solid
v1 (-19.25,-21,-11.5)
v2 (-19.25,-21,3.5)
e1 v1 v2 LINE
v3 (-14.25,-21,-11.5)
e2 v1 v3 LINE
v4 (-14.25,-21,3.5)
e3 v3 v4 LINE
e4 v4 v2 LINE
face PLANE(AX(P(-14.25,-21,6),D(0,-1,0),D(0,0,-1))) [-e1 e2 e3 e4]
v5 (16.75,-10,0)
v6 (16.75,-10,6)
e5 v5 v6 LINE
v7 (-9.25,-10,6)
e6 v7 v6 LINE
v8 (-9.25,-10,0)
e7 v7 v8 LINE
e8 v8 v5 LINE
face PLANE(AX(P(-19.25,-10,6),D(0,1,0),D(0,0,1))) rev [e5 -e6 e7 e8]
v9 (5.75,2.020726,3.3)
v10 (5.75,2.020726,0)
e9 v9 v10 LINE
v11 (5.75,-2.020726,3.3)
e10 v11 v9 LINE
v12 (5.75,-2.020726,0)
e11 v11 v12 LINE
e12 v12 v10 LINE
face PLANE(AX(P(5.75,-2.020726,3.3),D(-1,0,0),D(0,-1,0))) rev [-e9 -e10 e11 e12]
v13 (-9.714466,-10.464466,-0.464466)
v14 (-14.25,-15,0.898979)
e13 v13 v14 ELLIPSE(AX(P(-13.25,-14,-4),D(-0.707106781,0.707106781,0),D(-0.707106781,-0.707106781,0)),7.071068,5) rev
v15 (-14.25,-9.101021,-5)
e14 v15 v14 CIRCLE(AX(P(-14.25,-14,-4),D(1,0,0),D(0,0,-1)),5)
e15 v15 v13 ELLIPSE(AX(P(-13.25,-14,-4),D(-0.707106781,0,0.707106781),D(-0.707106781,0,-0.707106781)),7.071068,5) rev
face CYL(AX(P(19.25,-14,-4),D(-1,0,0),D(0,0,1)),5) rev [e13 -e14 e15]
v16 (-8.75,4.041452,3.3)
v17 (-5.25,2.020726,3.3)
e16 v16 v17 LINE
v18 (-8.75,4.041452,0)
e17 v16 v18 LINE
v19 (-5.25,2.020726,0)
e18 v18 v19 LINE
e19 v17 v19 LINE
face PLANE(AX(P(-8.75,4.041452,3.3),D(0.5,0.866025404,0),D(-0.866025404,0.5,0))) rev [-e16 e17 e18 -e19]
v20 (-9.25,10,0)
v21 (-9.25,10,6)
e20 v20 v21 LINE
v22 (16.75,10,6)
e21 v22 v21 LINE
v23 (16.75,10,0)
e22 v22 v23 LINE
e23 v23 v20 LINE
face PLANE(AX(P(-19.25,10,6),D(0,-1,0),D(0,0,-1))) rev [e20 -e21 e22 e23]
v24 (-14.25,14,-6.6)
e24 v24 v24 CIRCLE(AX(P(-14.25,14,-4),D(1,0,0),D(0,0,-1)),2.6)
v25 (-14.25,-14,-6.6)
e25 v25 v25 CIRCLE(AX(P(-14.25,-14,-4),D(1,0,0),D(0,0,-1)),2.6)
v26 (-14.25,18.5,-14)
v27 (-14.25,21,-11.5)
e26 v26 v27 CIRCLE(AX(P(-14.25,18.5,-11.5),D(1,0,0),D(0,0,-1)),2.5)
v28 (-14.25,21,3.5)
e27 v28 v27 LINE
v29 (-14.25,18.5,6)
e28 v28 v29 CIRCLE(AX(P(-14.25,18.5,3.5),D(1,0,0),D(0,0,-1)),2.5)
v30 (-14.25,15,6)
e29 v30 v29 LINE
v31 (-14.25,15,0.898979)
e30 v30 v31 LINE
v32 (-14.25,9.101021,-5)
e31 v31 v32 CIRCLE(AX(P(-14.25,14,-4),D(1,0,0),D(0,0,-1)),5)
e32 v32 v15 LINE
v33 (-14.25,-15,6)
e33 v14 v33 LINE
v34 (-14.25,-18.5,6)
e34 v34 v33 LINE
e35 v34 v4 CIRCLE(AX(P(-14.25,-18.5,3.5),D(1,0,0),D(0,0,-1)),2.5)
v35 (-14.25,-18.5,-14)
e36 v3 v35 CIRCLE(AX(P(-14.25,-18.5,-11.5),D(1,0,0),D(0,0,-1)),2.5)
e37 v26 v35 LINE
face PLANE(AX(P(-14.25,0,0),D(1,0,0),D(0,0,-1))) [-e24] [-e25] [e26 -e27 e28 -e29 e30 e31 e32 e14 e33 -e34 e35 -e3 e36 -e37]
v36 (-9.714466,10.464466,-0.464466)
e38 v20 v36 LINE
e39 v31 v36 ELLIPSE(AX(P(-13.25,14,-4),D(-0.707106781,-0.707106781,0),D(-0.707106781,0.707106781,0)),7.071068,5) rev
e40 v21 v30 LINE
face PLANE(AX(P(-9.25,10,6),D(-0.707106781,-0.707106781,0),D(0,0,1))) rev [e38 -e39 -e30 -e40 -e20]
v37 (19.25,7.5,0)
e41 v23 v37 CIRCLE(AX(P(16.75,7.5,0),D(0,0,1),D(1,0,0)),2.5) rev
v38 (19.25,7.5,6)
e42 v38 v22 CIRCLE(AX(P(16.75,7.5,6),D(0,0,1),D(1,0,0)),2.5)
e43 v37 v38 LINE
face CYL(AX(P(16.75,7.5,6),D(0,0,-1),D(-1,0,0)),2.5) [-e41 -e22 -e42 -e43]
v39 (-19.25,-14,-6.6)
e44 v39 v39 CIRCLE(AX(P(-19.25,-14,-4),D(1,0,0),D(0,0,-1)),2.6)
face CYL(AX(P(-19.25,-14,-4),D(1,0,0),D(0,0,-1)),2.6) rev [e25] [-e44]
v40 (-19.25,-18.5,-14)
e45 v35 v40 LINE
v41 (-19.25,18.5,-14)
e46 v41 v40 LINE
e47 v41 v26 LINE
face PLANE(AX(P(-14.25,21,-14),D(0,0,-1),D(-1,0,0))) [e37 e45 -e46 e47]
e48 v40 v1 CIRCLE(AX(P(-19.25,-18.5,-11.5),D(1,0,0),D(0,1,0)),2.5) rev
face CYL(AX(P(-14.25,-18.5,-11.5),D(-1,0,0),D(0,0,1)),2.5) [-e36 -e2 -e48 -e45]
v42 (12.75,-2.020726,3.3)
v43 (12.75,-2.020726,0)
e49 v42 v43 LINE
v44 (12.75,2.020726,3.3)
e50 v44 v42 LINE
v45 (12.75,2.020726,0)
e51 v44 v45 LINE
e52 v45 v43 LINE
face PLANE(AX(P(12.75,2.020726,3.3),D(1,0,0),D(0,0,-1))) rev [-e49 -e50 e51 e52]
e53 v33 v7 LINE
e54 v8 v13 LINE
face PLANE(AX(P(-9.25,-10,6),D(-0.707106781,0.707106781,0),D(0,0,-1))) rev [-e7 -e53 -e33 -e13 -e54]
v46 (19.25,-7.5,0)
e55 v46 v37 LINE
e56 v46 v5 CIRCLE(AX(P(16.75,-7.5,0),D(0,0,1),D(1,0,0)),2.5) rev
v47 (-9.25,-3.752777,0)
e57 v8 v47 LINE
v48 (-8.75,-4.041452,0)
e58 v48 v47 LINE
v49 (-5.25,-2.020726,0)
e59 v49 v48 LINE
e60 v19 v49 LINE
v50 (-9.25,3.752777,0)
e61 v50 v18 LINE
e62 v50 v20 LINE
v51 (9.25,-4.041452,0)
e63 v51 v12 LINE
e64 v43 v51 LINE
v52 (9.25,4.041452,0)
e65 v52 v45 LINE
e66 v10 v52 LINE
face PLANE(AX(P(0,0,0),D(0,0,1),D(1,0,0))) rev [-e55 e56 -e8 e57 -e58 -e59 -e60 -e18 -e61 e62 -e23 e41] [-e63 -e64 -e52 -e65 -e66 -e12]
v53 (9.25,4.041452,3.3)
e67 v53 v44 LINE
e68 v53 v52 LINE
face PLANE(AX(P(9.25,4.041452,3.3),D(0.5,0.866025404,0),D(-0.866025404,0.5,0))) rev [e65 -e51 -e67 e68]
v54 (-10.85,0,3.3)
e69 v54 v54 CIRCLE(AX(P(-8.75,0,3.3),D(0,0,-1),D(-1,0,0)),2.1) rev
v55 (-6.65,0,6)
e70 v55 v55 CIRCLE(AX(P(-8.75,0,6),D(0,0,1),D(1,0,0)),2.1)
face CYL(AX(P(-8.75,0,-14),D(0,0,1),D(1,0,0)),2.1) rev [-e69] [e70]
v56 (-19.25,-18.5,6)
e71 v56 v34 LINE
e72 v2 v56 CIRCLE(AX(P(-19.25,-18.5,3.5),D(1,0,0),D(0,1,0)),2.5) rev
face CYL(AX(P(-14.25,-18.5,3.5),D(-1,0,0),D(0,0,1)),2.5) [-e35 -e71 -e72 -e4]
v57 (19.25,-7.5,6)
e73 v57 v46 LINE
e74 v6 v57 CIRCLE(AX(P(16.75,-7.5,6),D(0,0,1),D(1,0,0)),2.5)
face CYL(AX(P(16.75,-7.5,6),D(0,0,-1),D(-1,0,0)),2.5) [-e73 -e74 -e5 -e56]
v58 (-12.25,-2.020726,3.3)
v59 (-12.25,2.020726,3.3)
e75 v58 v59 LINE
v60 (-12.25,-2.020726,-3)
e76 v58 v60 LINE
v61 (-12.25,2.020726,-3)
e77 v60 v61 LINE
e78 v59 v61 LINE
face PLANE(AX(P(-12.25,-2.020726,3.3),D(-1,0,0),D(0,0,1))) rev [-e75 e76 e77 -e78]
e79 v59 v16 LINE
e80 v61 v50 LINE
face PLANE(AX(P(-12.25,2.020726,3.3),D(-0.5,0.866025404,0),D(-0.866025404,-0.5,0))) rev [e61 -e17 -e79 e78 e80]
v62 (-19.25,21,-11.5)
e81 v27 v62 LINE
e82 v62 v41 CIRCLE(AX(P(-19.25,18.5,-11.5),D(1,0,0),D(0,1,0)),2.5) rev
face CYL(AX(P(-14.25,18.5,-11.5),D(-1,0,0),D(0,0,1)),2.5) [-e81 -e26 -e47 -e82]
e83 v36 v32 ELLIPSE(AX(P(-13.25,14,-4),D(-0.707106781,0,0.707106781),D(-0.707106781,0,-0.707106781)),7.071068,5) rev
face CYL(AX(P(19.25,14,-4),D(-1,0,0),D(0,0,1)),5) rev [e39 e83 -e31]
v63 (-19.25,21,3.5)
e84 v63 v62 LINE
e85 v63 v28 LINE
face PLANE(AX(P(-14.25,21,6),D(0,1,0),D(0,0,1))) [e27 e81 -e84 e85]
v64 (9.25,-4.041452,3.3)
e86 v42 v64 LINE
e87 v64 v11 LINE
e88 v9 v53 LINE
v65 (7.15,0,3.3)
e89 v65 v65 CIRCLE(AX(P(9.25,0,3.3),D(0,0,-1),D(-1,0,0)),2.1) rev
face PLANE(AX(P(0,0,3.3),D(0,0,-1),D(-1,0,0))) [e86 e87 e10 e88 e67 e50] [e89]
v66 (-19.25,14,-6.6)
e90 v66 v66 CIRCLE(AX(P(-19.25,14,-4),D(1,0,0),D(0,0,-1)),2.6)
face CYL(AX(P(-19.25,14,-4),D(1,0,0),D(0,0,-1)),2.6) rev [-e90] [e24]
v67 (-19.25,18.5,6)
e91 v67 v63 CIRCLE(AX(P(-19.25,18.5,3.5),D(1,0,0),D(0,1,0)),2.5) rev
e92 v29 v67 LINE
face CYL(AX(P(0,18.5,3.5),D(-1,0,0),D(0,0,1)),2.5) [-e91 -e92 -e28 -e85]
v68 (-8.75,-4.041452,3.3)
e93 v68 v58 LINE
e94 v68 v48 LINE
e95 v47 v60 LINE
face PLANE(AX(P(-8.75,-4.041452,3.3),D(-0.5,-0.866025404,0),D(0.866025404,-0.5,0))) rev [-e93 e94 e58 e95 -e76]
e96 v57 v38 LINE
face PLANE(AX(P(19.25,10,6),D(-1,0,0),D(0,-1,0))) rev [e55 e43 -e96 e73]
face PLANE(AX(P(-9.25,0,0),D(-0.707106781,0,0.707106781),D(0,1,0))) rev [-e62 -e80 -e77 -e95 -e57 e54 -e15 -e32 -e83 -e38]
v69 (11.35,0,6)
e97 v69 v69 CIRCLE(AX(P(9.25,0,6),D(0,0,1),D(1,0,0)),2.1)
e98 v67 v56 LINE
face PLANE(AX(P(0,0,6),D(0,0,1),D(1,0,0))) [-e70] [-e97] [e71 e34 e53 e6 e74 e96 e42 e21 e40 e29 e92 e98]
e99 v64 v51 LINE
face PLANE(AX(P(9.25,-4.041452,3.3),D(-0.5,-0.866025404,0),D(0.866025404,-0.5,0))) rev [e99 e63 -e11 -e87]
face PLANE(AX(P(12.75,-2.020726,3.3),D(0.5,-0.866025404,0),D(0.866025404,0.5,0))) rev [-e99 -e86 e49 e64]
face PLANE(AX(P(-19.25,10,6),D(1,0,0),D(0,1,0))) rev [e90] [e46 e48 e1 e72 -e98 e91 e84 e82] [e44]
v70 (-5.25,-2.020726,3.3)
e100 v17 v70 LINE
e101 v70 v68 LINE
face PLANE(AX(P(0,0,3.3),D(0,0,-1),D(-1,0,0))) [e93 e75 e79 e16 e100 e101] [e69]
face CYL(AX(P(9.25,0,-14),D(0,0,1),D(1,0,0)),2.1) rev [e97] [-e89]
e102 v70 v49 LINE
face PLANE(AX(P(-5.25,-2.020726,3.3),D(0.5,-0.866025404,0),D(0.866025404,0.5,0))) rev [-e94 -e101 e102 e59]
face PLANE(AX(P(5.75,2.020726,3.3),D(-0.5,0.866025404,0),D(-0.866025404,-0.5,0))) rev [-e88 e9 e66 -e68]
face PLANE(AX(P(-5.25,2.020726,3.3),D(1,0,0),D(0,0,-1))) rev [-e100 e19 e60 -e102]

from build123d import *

# Parameters (mm, degrees)
SKETCH_1_W          = 38.5
SKETCH_1_H          = 20
EXTRUDE_1_DEPTH     = 6
SKETCH_2_W          = 20
SKETCH_2_H          = 42
EXTRUDE_2_DEPTH     = 5
SKETCH_3_R          = 2.1
CUT_EXTRUDE_1_DEPTH = 35.807506374
CUT_EXTRUDE_2_DEPTH = 3.3
SKETCH_5_R          = 2.6
CUT_EXTRUDE_3_DEPTH = 42.943414263
CHAMFER_2_SIZE      = 5
SKETCH_6_R          = 5
CUT_EXTRUDE_4_DEPTH = 42.943414263
FILLET_1_R          = 2.5


with BuildPart() as part:
    # Эскиз1 → Бобышка-Вытянуть1 (new body)
    with BuildSketch(Plane.XY):
        Rectangle(SKETCH_1_W, SKETCH_1_H)
    extrude(amount=EXTRUDE_1_DEPTH)

    # Эскиз2 → Бобышка-Вытянуть2 (add)
    with BuildSketch(Plane.ZY.offset(19.25)):
        with Locations((-4, 0)):
            Rectangle(SKETCH_2_W, SKETCH_2_H)
    extrude(amount=-EXTRUDE_2_DEPTH)

    # Эскиз3 → Вырез-Вытянуть1 (cut, through all)
    with BuildSketch(Plane.XY.offset(6)):
        with Locations((9.25, 0)):
            Circle(SKETCH_3_R)
        with Locations((-8.75, 0)):
            Circle(SKETCH_3_R)
    extrude(amount=-CUT_EXTRUDE_1_DEPTH, mode=Mode.SUBTRACT)

    # Эскиз4 → Вырез-Вытянуть2 (cut)
    with BuildSketch(Plane(origin=(0, 0, 0), x_dir=(-1, 0, 0), z_dir=(0, 0, -1))):
        Polygon((8.75, 4.041451884), (5.25, 2.020725942), (5.25, -2.020725942), (8.75, -4.041451884), (12.25, -2.020725942), (12.25, 2.020725942), align=None)
        Polygon((-9.25, 4.041451884), (-12.75, 2.020725942), (-12.75, -2.020725942), (-9.25, -4.041451884), (-5.75, -2.020725942), (-5.75, 2.020725942), align=None)
    extrude(amount=-CUT_EXTRUDE_2_DEPTH, mode=Mode.SUBTRACT)

    # Эскиз5 → Вырез-Вытянуть3 (cut, through all)
    with BuildSketch(Plane(origin=(-14.25, 0, 0), x_dir=(0, 0, -1), z_dir=(1, 0, 0))):
        with Locations((4, 14)):
            Circle(SKETCH_5_R)
        with Locations((4, -14)):
            Circle(SKETCH_5_R)
    extrude(amount=-CUT_EXTRUDE_3_DEPTH, mode=Mode.SUBTRACT)

    # Фаска2
    # the kernel refuses this chamfer: 5 mm, written as the material it adds along each edge
    with BuildSketch(Plane(origin=(-14.25, 10, -12.85841494), x_dir=(0, 1, 0), z_dir=(0, 0, 1))) as chamfer_2_piece_1_section:
        Polygon((CHAMFER_2_SIZE, 0), (0, -CHAMFER_2_SIZE), (0, 0), align=None)
    chamfer_2_piece_1 = extrude(amount=18.85841494, mode=Mode.PRIVATE)
    chamfer_2_piece_1 = chamfer_2_piece_1 - Plane(origin=(-14.25, 14, -4), x_dir=(0, 0, -1), z_dir=(1, 0, 0)) * Cylinder(2.6, 58, mode=Mode.PRIVATE)
    chamfer_2_piece_1 = split(chamfer_2_piece_1, bisect_by=Plane(origin=(-18.17920747, 10, -8.92920747), z_dir=(-0.7071067811865476, 0, 0.7071067811865476)), keep=Keep.TOP, mode=Mode.PRIVATE)
    add(chamfer_2_piece_1)
    with BuildSketch(Plane(origin=(-14.25, -10, 6), x_dir=(0, -1, 0), z_dir=(0, 0, -1))) as chamfer_2_piece_2_section:
        Polygon((CHAMFER_2_SIZE, 0), (0, -CHAMFER_2_SIZE), (0, 0), align=None)
    chamfer_2_piece_2 = extrude(amount=18.85841494, mode=Mode.PRIVATE)
    chamfer_2_piece_2 = chamfer_2_piece_2 - Plane(origin=(-14.25, -14, -4), x_dir=(0, 0, -1), z_dir=(1, 0, 0)) * Cylinder(2.6, 58, mode=Mode.PRIVATE)
    chamfer_2_piece_2 = split(chamfer_2_piece_2, bisect_by=Plane(origin=(-8.75, -10, 0.5), z_dir=(-0.7071067811865476, 0, 0.7071067811865476)), keep=Keep.TOP, mode=Mode.PRIVATE)
    add(chamfer_2_piece_2)
    with BuildSketch(Plane(origin=(-14.25, -22.85841494, 0), x_dir=(0, 0, -1), z_dir=(0, 1, 0))) as chamfer_2_piece_3_section:
        Polygon((CHAMFER_2_SIZE, 0), (0, -CHAMFER_2_SIZE), (0, 0), align=None)
    chamfer_2_piece_3 = extrude(amount=45.71682988, mode=Mode.PRIVATE)
    chamfer_2_piece_3 = chamfer_2_piece_3 - Plane(origin=(-14.25, -14, -4), x_dir=(0, 0, -1), z_dir=(1, 0, 0)) * Cylinder(2.6, 112, mode=Mode.PRIVATE)
    chamfer_2_piece_3 = split(chamfer_2_piece_3, bisect_by=Plane(origin=(-4.727015986, -6.364122788, 0), z_dir=(-0.5, -0.8660254037844387, 0)), keep=Keep.TOP, mode=Mode.PRIVATE)
    chamfer_2_piece_3 = split(chamfer_2_piece_3, bisect_by=Plane(origin=(-18.17920747, -18.92920747, 0), z_dir=(-0.7071067811865478, 0.7071067811865472, 0)), keep=Keep.TOP, mode=Mode.PRIVATE)
    add(chamfer_2_piece_3)
    with BuildSketch(Plane(origin=(-14.25, -22.85841494, 0), x_dir=(0, 0, -1), z_dir=(0, 1, 0))) as chamfer_2_piece_4_section:
        Polygon((CHAMFER_2_SIZE, 0), (0, -CHAMFER_2_SIZE), (0, 0), align=None)
    chamfer_2_piece_4 = extrude(amount=45.71682988, mode=Mode.PRIVATE)
    chamfer_2_piece_4 = chamfer_2_piece_4 - Plane(origin=(-14.25, 14, -4), x_dir=(0, 0, -1), z_dir=(1, 0, 0)) * Cylinder(2.6, 112, mode=Mode.PRIVATE)
    chamfer_2_piece_4 = split(chamfer_2_piece_4, bisect_by=Plane(origin=(-4.727015986, -6.364122788, 0), z_dir=(0.5, 0.8660254037844387, 0)), keep=Keep.TOP, mode=Mode.PRIVATE)
    chamfer_2_piece_4 = split(chamfer_2_piece_4, bisect_by=Plane(origin=(-12.25, -22.85841494, 0), z_dir=(-1, 0, 0)), keep=Keep.TOP, mode=Mode.PRIVATE)
    chamfer_2_piece_4 = split(chamfer_2_piece_4, bisect_by=Plane(origin=(4.67920747, -3.92920747, 0), z_dir=(-0.7071067811865476, -0.7071067811865476, 0)), keep=Keep.TOP, mode=Mode.PRIVATE)
    add(chamfer_2_piece_4)
    with BuildSketch(Plane(origin=(-14.25, -22.85841494, 0), x_dir=(0, 0, -1), z_dir=(0, 1, 0))) as chamfer_2_piece_5_section:
        Polygon((CHAMFER_2_SIZE, 0), (0, -CHAMFER_2_SIZE), (0, 0), align=None)
    chamfer_2_piece_5 = extrude(amount=45.71682988, mode=Mode.PRIVATE)
    chamfer_2_piece_5 = chamfer_2_piece_5 - Plane(origin=(-14.25, 14, -4), x_dir=(0, 0, -1), z_dir=(1, 0, 0)) * Cylinder(2.6, 112, mode=Mode.PRIVATE)
    chamfer_2_piece_5 = split(chamfer_2_piece_5, bisect_by=Plane(origin=(-24.522984014, -5.065084682, 0), z_dir=(-0.4999999999999998, 0.8660254037844388, 0)), keep=Keep.TOP, mode=Mode.PRIVATE)
    chamfer_2_piece_5 = split(chamfer_2_piece_5, bisect_by=Plane(origin=(4.67920747, -3.92920747, 0), z_dir=(-0.7071067811865476, -0.7071067811865476, 0)), keep=Keep.TOP, mode=Mode.PRIVATE)
    add(chamfer_2_piece_5)

    # Эскиз6 → Вырез-Вытянуть4 (cut, through all)
    with BuildSketch(Plane(origin=(-14.25, 0, 0), x_dir=(0, 0, -1), z_dir=(1, 0, 0))):
        with Locations((4, -14)):
            Circle(SKETCH_6_R)
        with Locations((4, 14)):
            Circle(SKETCH_6_R)
    extrude(amount=CUT_EXTRUDE_4_DEPTH, mode=Mode.SUBTRACT)

    # Скругление1
    fillet_1_edges = [part.edges().sort_by_distance(p)[0] for p in [
        (-16.75, 21, 6),
        (-16.75, -21, 6),
        (-16.75, -21, -14),
        (-16.75, 21, -14),
        (19.25, 10, 3),
        (19.25, -10, 3),
    ]]
    fillet(fillet_1_edges, radius=FILLET_1_R)


solid = part.part
